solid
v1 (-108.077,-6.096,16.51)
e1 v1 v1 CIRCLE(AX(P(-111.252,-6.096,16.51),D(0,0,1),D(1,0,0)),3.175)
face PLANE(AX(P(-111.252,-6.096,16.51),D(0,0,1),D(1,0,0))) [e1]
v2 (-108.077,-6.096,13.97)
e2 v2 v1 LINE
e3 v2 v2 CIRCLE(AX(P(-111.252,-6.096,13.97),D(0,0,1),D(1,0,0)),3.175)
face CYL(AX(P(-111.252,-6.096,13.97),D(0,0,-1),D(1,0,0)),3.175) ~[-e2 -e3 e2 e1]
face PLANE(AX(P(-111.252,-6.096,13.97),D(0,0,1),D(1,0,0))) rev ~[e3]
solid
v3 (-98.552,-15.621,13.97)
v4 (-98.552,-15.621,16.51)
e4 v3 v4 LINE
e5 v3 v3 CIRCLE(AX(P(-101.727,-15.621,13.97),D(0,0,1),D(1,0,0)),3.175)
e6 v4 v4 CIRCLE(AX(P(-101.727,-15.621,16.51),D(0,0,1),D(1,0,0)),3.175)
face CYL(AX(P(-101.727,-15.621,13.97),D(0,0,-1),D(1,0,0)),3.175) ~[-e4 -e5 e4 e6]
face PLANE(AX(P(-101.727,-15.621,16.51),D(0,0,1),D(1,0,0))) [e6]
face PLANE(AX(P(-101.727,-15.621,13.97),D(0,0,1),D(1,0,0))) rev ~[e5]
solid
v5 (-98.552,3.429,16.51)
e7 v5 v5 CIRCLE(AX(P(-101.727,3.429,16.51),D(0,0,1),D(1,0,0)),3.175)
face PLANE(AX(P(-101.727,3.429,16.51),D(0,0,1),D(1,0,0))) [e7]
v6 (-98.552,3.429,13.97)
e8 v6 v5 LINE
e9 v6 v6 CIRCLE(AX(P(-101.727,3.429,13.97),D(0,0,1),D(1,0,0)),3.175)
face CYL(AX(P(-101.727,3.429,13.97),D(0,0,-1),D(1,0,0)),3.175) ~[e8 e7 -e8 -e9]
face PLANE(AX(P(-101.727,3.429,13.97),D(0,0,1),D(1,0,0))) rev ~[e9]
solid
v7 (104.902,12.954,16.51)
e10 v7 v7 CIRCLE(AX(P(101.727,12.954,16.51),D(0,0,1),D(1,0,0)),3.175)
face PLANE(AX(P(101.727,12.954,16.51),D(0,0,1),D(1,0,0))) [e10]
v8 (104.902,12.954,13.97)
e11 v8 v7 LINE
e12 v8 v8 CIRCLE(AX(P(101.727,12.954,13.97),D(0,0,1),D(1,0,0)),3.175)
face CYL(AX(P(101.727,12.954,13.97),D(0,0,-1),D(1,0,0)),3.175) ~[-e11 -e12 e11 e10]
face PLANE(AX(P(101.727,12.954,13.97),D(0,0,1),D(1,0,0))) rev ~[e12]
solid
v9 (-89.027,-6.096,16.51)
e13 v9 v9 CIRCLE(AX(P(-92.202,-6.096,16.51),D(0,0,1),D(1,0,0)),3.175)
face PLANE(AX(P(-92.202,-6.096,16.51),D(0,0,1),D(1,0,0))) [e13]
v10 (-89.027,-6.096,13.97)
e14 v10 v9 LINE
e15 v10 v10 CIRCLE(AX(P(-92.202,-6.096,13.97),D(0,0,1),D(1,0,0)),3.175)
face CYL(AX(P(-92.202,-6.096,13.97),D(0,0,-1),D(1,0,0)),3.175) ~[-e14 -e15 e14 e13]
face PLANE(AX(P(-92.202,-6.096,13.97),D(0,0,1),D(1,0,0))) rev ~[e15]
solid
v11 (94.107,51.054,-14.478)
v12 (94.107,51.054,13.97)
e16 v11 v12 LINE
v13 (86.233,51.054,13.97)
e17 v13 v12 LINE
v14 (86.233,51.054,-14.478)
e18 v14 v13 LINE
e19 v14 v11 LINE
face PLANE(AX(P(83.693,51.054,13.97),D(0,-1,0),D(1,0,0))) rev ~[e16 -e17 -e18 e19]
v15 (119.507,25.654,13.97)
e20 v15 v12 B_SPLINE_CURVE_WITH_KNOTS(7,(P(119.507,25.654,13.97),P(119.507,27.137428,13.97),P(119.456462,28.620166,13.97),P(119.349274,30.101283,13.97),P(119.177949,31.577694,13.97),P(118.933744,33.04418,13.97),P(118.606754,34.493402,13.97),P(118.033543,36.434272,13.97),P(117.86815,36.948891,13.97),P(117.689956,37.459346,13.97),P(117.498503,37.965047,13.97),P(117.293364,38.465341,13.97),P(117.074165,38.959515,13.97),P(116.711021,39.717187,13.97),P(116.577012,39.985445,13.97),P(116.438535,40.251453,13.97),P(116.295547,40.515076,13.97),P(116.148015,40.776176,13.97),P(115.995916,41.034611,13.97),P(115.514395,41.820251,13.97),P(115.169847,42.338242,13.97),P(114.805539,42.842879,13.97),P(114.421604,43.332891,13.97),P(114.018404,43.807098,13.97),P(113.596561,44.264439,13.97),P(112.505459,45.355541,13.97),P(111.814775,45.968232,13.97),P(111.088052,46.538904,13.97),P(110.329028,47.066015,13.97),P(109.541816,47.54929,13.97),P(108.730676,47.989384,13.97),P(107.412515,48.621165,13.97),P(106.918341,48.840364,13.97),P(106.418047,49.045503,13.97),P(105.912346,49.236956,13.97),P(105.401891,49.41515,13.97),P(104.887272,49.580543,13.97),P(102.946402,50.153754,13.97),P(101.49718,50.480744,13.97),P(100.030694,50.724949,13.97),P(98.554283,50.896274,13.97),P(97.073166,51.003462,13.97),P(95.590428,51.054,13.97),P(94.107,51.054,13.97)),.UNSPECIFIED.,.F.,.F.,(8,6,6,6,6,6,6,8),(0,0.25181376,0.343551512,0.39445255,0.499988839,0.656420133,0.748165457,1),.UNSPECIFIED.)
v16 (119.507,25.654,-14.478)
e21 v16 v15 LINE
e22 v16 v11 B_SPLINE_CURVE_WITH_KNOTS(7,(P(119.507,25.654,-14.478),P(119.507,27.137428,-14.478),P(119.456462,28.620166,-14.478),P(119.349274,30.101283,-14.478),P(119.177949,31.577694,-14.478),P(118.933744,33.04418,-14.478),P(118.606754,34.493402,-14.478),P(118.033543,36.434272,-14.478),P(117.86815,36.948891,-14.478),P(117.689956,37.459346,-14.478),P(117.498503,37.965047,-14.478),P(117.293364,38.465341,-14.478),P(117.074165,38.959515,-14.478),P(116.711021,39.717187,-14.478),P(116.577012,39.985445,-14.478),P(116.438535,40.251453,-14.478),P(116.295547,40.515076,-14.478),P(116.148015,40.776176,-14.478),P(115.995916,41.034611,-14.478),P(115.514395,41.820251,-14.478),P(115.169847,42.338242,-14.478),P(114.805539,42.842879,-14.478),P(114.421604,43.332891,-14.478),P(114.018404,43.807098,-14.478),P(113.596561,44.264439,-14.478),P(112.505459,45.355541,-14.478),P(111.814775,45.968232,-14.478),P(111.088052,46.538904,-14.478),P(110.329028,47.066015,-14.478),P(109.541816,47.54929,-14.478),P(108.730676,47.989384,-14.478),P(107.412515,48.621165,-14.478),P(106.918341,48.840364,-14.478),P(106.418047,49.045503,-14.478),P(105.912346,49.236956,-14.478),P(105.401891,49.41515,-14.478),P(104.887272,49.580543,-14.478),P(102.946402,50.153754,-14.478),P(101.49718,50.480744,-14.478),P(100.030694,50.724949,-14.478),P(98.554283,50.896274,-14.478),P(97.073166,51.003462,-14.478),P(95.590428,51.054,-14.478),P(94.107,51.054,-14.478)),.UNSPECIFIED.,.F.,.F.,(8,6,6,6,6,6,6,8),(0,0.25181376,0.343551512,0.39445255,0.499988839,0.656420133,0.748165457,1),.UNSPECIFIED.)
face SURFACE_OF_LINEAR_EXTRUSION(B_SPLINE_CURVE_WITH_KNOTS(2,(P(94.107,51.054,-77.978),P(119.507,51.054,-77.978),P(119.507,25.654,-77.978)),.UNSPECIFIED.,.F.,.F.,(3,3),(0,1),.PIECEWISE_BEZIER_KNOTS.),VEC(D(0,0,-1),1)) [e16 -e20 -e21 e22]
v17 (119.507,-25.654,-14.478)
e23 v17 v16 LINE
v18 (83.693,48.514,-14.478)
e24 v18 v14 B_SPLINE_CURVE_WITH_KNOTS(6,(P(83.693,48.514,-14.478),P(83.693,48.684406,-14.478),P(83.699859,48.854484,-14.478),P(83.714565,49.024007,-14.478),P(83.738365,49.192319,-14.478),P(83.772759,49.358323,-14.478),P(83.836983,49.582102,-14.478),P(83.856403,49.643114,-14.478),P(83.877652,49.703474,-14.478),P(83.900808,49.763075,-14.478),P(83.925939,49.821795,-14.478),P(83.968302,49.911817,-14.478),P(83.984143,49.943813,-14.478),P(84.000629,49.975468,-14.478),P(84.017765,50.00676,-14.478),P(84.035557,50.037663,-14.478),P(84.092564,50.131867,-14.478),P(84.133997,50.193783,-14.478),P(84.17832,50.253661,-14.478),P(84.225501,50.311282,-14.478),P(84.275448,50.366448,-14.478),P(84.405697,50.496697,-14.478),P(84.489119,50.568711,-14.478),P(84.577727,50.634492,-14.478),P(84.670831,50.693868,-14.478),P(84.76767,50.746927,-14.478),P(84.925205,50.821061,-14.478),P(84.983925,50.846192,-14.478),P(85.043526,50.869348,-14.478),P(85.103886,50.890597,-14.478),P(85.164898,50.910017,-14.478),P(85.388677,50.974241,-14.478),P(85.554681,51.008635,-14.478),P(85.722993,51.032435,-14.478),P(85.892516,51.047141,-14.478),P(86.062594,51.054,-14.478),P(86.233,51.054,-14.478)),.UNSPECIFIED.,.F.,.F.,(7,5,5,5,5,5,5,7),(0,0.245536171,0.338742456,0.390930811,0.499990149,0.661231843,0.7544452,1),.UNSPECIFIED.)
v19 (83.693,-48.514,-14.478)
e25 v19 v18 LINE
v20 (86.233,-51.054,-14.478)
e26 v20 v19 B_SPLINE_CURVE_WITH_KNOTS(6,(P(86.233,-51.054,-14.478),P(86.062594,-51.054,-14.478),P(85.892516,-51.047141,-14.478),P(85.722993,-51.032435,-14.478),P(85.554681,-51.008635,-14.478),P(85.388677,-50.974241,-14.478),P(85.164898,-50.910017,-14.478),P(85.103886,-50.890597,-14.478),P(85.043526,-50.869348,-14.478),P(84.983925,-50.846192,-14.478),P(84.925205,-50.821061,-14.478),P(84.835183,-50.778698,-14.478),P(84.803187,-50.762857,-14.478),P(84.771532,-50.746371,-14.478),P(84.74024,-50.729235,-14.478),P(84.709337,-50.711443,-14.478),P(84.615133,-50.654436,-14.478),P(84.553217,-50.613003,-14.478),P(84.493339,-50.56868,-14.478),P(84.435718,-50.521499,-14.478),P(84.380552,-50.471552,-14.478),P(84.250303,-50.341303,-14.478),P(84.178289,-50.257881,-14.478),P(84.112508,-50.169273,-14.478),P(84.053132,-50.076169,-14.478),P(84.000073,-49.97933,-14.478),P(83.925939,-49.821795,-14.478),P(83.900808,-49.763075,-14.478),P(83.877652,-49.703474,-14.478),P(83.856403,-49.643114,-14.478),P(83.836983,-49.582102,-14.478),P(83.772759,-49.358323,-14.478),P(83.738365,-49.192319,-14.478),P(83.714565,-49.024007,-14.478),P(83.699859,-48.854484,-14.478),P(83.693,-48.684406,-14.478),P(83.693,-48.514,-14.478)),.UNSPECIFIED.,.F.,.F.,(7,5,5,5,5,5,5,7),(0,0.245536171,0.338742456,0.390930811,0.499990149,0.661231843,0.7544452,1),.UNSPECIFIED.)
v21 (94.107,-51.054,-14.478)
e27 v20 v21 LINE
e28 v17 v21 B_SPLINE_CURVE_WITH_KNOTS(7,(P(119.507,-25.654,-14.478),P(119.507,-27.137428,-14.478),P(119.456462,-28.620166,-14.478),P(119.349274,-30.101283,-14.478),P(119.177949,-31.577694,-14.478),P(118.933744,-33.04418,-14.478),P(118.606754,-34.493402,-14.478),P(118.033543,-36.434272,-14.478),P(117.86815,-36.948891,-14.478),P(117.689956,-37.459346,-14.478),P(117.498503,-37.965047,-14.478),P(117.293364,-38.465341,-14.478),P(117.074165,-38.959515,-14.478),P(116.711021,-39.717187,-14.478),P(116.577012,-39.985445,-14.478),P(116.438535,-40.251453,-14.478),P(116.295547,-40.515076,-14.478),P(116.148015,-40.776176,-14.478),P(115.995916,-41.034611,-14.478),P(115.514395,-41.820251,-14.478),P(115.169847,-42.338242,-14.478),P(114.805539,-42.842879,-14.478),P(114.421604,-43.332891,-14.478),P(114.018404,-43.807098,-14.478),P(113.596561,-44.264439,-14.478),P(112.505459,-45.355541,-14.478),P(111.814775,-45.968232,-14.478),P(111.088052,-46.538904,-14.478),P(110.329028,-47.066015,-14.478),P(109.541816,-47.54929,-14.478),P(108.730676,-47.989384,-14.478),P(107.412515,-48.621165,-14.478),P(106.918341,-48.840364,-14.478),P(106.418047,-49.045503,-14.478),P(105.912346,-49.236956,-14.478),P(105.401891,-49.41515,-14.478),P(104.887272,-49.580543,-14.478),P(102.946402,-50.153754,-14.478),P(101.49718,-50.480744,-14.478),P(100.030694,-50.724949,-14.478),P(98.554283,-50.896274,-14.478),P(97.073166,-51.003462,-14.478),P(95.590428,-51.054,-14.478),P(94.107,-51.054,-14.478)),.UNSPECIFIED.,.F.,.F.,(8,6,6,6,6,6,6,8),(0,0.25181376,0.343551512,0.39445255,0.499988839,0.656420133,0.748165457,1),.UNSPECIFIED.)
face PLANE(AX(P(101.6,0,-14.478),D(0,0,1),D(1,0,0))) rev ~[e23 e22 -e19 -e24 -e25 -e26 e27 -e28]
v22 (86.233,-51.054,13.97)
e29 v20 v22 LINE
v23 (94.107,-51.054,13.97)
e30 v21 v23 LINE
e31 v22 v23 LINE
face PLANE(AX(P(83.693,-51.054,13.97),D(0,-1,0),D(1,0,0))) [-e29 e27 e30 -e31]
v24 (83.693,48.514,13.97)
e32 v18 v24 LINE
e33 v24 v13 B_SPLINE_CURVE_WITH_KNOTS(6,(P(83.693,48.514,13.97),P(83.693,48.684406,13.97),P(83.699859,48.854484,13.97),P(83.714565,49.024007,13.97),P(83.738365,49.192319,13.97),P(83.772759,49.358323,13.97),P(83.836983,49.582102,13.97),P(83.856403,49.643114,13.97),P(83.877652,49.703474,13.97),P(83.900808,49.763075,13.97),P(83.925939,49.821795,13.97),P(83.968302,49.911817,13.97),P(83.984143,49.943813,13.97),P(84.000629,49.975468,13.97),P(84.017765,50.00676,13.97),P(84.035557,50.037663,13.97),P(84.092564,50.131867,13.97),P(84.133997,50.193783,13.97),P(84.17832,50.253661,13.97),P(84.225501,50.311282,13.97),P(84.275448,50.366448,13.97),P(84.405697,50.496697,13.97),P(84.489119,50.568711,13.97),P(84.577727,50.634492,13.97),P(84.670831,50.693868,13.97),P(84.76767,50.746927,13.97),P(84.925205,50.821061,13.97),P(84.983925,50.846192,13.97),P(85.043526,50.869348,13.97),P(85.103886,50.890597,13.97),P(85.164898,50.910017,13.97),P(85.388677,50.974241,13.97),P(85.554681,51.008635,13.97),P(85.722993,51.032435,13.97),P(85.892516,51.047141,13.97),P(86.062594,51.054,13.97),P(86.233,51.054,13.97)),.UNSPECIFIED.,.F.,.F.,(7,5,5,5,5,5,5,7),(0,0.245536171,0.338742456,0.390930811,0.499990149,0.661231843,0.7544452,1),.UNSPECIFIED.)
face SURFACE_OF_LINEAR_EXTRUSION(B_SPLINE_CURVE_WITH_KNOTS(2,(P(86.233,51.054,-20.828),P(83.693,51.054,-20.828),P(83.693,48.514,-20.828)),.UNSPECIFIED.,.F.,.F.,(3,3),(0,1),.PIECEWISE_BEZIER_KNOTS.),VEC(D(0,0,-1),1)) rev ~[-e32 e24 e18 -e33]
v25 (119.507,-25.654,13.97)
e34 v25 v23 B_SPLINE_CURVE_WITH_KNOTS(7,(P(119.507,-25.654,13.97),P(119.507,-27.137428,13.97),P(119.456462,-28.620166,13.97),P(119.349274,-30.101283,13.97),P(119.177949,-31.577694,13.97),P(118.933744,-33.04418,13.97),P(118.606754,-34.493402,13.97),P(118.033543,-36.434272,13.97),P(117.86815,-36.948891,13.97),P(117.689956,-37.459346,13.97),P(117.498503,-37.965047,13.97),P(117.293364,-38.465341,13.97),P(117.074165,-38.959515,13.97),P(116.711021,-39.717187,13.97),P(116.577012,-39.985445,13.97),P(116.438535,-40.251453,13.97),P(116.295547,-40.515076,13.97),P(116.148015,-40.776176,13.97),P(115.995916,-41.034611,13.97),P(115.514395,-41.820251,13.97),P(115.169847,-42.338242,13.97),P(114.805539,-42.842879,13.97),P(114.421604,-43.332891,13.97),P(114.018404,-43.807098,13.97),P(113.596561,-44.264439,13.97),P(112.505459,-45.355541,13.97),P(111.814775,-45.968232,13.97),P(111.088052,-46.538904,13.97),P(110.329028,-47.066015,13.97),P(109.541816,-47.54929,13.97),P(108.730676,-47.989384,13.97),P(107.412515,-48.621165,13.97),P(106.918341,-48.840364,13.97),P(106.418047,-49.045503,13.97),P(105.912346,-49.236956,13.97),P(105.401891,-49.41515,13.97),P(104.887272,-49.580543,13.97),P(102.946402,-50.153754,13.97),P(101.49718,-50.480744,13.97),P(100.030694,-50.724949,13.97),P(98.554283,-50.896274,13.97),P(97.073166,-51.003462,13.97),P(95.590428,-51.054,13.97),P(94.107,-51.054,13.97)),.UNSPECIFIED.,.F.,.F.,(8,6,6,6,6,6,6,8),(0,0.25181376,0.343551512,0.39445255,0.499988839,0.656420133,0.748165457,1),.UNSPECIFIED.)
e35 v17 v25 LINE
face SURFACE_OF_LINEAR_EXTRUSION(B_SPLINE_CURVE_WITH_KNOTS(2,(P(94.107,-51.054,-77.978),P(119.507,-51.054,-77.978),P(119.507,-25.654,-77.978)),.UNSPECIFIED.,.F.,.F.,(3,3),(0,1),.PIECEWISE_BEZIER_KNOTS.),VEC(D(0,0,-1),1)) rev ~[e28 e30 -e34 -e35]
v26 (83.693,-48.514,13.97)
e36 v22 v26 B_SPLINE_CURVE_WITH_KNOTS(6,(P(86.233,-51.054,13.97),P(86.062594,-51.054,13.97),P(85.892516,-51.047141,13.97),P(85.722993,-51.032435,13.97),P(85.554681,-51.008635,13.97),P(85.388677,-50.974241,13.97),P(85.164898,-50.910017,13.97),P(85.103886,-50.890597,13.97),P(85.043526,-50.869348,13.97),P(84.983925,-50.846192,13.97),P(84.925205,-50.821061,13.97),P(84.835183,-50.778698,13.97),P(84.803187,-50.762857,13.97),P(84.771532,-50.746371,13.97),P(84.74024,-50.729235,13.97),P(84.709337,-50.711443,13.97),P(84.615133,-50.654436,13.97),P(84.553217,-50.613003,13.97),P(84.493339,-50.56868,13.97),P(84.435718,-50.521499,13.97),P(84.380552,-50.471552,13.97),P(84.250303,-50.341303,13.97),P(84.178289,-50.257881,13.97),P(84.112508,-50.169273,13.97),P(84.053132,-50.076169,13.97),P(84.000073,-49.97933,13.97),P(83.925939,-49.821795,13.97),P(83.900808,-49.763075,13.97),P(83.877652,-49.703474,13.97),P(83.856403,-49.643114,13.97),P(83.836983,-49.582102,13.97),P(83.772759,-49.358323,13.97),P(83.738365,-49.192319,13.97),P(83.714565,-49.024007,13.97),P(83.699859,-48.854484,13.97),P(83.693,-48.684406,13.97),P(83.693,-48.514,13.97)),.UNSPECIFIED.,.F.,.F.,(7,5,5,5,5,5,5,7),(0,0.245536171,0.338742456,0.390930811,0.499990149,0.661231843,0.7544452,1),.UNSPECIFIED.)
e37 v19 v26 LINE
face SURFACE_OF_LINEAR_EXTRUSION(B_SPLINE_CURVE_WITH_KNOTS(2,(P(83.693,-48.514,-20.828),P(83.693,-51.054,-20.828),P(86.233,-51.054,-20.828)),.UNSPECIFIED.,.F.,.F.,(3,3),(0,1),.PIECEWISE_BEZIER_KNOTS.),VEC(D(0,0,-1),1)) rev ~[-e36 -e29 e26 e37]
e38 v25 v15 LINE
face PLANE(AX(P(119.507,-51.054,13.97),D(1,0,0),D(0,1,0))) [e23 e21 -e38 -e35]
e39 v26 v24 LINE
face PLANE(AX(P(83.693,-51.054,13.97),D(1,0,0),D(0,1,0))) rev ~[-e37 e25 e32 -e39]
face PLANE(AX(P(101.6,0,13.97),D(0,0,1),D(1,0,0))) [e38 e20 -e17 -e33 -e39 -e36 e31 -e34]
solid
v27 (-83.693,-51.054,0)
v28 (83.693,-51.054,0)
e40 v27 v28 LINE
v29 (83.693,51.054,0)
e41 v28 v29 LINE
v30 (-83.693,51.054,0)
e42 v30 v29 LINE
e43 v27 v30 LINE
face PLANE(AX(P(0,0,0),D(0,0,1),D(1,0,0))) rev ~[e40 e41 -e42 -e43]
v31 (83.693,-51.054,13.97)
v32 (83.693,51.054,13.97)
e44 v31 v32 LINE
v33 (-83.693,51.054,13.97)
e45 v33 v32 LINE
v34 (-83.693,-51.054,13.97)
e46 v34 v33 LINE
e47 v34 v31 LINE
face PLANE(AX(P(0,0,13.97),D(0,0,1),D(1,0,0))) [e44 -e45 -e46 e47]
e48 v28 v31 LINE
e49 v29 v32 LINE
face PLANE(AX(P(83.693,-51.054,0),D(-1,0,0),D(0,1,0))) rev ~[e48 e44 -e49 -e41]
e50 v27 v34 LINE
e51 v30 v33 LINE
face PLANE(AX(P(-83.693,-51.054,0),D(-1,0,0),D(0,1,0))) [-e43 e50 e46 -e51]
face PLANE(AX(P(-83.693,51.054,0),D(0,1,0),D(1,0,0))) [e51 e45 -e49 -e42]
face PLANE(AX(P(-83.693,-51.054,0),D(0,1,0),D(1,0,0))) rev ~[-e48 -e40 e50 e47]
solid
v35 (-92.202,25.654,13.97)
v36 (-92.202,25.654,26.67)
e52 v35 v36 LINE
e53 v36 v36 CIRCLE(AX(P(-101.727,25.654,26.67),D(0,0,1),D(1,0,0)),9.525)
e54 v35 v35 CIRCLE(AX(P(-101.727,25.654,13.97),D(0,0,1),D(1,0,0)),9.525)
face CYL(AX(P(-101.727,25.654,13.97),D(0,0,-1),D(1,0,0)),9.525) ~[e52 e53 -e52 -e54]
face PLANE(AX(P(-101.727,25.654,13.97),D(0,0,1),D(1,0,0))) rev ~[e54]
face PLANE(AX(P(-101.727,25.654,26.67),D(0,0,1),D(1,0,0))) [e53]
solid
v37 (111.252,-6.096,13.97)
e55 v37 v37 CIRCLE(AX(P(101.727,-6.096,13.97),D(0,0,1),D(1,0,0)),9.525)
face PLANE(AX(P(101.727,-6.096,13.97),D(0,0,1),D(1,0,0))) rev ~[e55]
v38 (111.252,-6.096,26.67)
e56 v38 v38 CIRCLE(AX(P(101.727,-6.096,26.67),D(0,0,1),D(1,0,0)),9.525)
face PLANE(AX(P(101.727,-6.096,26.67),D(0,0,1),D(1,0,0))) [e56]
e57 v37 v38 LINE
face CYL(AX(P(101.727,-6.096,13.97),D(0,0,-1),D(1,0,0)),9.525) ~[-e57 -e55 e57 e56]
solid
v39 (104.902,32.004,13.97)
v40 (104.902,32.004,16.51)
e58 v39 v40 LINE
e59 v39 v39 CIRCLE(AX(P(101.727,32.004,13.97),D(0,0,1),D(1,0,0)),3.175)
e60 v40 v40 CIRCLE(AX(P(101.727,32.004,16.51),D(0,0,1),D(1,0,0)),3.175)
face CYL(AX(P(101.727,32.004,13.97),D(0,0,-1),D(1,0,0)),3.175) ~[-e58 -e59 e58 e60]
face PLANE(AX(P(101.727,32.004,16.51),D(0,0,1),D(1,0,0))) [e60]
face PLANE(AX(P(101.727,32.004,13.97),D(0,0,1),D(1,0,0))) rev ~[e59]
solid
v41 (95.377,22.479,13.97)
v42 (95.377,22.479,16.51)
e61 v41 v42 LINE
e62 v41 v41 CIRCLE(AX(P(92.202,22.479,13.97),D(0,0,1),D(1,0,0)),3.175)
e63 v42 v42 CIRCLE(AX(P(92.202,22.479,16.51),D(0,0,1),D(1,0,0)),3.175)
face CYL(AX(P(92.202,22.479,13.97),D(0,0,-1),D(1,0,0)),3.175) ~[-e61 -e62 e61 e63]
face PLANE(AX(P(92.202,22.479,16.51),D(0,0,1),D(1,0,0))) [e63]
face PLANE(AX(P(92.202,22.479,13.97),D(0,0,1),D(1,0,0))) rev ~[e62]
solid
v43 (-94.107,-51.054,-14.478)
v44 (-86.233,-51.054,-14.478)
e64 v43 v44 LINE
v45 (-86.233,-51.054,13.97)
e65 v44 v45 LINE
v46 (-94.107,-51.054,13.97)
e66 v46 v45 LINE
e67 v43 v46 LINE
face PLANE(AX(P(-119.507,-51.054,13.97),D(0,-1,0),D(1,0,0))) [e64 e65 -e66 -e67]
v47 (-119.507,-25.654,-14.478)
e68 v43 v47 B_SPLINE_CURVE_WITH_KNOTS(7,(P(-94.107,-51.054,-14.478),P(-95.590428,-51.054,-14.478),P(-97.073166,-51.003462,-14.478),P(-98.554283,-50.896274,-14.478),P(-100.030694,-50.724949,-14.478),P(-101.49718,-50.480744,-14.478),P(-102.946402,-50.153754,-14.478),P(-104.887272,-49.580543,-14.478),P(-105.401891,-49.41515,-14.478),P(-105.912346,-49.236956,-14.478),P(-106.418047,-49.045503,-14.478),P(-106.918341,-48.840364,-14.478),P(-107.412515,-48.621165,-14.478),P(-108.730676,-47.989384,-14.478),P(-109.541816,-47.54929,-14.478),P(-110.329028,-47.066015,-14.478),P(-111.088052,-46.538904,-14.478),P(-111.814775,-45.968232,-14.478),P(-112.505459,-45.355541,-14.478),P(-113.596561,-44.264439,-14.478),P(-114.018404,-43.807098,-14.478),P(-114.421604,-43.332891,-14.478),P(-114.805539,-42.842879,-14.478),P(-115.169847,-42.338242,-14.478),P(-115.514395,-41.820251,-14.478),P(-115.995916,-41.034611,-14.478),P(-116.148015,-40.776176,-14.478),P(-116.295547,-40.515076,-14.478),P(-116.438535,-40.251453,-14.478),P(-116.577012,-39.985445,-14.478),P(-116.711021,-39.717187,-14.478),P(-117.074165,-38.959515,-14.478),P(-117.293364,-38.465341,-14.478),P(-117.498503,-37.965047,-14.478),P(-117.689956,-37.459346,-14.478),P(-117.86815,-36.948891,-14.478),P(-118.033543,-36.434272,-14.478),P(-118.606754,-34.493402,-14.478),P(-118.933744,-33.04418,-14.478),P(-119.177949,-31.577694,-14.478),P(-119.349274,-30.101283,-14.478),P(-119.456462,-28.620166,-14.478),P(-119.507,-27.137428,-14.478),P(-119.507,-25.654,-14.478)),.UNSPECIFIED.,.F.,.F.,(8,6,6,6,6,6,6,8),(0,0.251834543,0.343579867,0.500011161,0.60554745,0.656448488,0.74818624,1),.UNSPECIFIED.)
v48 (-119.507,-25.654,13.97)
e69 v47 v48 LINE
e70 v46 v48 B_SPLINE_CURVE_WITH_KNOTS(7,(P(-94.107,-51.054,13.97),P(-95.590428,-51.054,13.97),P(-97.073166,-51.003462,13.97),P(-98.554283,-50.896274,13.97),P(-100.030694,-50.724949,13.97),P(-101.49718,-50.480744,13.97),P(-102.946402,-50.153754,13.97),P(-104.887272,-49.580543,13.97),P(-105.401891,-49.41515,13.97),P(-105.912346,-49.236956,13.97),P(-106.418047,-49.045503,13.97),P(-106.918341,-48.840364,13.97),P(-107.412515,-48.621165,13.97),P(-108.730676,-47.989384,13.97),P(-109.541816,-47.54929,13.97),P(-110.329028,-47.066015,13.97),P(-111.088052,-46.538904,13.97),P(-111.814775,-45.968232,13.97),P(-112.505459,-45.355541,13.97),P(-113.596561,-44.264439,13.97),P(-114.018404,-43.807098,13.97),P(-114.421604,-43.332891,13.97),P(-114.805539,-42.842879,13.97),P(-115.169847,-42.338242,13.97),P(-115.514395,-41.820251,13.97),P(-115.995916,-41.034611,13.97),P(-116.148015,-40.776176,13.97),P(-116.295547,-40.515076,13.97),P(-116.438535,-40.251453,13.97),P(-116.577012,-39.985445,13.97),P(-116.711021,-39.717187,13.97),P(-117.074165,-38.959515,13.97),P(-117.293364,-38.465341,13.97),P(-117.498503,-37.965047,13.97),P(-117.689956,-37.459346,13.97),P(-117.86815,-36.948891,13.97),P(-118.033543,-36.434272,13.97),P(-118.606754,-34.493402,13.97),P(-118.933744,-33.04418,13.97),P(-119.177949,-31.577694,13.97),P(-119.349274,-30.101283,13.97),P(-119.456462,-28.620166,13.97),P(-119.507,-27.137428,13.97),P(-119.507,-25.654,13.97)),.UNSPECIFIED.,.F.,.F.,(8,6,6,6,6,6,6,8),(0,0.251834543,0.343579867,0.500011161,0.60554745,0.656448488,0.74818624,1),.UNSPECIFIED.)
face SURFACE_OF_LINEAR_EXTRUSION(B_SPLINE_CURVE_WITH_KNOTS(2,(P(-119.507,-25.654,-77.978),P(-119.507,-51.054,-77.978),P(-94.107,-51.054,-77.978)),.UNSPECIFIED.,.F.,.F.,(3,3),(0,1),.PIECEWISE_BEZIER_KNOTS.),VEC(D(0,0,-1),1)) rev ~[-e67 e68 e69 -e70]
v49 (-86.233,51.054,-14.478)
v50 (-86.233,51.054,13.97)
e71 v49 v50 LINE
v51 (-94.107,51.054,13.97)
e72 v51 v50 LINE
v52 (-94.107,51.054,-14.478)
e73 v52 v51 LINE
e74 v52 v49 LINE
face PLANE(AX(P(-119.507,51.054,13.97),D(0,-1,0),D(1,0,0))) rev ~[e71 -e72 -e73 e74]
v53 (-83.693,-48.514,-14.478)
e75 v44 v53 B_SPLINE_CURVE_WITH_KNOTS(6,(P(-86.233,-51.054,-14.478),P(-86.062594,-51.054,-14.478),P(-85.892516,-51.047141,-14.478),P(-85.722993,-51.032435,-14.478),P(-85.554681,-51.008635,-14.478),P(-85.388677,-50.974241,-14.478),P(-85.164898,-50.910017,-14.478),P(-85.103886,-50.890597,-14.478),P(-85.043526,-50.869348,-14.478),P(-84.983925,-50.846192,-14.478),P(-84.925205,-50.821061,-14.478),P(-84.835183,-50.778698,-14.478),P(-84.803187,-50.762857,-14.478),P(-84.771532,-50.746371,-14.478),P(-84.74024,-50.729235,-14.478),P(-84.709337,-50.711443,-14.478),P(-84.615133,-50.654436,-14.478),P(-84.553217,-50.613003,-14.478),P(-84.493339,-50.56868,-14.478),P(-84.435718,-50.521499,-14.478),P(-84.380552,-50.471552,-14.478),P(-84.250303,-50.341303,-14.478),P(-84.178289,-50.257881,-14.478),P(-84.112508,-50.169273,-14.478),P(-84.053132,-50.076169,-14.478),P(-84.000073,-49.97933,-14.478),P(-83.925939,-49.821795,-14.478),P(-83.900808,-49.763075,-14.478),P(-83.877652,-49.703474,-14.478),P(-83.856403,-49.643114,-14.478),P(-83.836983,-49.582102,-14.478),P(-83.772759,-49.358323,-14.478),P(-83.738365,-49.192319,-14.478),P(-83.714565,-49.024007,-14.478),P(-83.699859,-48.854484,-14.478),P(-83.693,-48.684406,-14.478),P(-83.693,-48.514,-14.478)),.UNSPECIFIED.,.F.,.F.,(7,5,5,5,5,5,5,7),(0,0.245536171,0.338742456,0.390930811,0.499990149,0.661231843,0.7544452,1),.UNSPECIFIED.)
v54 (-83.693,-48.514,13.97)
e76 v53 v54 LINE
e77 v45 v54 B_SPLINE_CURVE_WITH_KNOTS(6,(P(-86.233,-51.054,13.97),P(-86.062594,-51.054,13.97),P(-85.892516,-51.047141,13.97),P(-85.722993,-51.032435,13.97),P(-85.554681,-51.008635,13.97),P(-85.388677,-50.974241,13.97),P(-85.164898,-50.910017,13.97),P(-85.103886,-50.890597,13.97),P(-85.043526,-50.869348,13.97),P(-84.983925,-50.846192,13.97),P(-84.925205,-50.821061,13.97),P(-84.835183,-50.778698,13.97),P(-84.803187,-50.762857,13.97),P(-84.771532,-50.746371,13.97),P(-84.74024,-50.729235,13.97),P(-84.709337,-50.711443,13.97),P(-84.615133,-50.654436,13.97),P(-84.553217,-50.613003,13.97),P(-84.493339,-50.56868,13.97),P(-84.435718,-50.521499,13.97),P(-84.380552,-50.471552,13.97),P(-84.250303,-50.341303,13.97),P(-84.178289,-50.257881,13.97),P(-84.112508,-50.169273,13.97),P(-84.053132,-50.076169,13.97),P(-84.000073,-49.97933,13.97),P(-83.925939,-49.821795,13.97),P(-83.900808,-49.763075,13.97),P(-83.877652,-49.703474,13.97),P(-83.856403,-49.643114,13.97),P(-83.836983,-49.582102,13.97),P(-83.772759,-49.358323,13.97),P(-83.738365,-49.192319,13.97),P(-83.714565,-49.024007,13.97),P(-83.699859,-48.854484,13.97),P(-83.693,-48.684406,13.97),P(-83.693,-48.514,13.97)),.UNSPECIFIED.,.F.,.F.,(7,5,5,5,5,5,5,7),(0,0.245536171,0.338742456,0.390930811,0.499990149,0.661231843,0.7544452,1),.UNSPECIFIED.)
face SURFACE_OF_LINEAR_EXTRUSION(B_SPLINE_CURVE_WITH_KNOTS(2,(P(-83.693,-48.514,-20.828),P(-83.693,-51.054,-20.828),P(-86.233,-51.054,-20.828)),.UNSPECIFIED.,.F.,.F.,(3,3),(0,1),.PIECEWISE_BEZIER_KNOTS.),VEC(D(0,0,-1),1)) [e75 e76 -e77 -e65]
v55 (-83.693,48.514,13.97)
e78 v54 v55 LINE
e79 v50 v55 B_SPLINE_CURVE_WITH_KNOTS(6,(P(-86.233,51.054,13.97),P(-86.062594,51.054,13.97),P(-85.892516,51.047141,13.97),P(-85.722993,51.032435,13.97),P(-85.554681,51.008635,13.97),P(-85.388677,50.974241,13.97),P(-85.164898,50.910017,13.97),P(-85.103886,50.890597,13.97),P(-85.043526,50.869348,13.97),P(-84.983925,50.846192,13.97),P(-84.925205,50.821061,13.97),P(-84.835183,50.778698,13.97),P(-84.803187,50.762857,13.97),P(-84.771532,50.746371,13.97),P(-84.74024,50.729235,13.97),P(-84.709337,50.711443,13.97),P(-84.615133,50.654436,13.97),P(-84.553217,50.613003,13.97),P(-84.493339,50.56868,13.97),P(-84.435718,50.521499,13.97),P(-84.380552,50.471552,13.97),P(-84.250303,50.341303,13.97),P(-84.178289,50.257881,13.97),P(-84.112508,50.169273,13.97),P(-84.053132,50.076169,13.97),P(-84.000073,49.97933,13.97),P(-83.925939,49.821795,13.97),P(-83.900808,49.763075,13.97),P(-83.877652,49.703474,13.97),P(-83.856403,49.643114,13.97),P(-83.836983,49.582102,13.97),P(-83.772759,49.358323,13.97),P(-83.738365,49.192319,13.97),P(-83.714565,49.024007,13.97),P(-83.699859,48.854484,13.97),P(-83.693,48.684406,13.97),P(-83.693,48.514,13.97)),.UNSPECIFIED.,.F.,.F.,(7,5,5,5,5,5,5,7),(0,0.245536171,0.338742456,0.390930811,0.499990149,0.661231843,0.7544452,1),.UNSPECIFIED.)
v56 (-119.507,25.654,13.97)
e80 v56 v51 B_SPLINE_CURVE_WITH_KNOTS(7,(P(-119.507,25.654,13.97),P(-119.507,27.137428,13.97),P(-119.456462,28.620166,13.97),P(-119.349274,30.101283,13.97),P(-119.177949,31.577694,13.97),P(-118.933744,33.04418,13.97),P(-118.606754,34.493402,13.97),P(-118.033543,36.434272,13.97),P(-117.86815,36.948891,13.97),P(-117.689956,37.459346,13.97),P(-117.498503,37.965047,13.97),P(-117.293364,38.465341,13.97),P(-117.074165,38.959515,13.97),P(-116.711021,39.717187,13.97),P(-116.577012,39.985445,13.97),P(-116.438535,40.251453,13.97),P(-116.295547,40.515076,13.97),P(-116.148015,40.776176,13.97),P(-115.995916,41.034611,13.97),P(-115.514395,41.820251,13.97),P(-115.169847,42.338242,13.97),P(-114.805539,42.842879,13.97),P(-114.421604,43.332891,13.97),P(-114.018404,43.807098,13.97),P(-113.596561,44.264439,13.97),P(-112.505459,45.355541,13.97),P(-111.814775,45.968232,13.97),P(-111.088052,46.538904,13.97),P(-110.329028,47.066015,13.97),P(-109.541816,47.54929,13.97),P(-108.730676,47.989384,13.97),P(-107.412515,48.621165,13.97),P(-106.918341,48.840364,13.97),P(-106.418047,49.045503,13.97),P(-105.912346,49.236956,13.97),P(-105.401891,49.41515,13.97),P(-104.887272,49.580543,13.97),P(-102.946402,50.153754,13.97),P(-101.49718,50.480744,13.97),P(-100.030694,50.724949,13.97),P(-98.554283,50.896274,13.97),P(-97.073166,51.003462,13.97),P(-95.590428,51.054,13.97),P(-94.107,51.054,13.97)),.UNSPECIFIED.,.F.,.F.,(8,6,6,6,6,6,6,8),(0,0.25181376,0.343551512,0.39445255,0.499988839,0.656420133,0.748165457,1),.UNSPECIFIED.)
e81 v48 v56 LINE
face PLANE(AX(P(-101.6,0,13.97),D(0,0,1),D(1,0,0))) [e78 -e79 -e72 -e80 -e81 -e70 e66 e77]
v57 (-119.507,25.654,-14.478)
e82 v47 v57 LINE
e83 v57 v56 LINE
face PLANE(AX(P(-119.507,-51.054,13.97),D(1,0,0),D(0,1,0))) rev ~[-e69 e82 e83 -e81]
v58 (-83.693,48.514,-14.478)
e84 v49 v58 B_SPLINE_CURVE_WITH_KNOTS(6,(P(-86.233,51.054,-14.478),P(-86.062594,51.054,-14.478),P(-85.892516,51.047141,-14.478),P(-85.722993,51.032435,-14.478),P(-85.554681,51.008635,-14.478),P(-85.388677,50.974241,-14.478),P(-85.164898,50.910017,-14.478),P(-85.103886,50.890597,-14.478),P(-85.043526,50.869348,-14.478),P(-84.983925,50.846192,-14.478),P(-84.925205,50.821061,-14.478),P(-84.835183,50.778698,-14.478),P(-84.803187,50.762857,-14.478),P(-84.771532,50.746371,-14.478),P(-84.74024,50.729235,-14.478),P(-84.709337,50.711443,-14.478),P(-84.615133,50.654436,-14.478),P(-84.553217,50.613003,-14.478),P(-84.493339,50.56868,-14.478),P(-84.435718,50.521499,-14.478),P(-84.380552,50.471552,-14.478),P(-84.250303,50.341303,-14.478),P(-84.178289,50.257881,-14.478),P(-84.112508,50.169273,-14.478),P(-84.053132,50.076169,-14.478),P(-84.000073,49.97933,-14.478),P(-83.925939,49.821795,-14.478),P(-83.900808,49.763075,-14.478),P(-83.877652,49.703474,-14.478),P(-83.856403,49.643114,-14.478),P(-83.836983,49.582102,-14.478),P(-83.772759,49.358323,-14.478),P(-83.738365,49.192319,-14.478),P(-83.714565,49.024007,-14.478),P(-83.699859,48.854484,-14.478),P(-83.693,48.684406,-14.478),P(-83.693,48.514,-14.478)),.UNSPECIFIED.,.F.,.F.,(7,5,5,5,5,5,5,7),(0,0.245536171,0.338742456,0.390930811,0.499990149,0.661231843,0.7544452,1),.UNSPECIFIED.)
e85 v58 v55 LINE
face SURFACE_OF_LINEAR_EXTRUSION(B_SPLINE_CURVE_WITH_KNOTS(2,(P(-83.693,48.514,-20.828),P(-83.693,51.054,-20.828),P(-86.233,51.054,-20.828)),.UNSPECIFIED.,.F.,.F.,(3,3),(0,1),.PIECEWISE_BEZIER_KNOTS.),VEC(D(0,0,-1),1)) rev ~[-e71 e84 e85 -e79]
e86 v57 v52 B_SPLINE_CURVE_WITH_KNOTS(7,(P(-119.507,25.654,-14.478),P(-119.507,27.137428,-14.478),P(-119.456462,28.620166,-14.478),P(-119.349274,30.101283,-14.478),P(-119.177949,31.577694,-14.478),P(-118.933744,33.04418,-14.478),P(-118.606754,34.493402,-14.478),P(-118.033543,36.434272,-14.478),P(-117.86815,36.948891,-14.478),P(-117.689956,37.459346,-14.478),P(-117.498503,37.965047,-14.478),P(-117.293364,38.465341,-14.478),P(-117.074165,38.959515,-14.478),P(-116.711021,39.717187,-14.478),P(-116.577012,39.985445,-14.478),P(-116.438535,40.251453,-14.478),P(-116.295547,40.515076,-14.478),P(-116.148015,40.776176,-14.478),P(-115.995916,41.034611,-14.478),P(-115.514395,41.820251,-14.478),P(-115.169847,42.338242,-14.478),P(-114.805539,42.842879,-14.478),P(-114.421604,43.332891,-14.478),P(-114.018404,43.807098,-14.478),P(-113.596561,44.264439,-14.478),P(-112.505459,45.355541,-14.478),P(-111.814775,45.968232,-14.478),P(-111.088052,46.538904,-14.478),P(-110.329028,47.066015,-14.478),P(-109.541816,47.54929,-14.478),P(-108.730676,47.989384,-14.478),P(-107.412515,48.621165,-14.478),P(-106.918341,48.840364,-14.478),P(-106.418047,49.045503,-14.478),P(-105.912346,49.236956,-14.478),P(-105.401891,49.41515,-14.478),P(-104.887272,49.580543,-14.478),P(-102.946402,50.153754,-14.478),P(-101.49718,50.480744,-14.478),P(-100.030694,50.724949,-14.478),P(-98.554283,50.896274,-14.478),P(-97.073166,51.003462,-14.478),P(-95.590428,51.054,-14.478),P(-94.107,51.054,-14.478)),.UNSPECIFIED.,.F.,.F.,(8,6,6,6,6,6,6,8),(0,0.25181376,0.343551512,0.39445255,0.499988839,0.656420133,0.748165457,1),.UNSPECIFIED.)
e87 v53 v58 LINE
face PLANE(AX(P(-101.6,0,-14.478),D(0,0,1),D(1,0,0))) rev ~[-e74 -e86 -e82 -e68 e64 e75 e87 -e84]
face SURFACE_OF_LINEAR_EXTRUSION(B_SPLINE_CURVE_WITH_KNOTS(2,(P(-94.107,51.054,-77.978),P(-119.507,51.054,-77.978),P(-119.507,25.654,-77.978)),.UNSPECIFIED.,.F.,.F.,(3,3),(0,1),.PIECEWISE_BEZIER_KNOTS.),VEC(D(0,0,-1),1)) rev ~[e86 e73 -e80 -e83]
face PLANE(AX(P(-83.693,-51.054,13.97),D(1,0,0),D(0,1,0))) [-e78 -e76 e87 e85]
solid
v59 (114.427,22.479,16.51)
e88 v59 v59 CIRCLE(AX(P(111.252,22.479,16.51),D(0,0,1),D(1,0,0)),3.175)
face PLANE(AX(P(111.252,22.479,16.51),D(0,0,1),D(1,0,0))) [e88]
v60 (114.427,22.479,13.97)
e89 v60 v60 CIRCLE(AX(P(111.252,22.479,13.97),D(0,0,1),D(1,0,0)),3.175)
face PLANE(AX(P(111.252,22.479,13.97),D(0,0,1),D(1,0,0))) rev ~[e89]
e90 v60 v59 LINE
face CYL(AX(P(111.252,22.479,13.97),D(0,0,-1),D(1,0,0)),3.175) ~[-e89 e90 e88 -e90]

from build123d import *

# Parameters (mm, degrees)
F0_W          = 167.386
F0_H          = 102.108
F1_DEPTH      = 13.97
F2_W          = 35.814
F2_H          = 102.108
F3_DEPTH      = 28.448
F4_W          = 35.814
F4_H          = 102.108
F5_DEPTH      = 28.448
F6_T1_DEPTH   = 155.448
F6_2_T1_DEPTH = 155.448
F7_T1_DEPTH   = 41.148
F7_2_T1_DEPTH = 41.148
F8_R          = 9.525
F9_DEPTH      = 12.7
F10_R         = 3.175
F14_DEPTH     = 2.54
F11_R         = 3.175
F15_DEPTH     = 2.54
F12_R         = 3.175
F13_R         = 3.175
F16_DEPTH     = 2.54
F17_R         = 3.175
F22_DEPTH     = 2.54
F19_R         = 3.175
F23_DEPTH     = 2.54
F20_R         = 3.175
F24_DEPTH     = 2.54
F21_R         = 9.525
F25_DEPTH     = 12.7
F26_R         = 3.175
F27_DEPTH     = 2.54


# Not quite as in the source:
# - a fillet or chamfer that OpenCascade refuses, or shapes differently, is made with other operations: its cross-section is extruded or revolved along the edge and cut away or added


with BuildPart() as f1:
    # F0 (on Top) → F1 (new body)
    with BuildSketch(Plane.XY):
        Rectangle(F0_W, F0_H)
    extrude(amount=F1_DEPTH)


with BuildPart() as f3:
    # F2 (on face) → F3 (new body)
    with BuildSketch(Plane.XY.offset(13.97)):
        with Locations((-101.6, 0)):
            Rectangle(F2_W, F2_H)
    extrude(amount=-F3_DEPTH)

    # F6: fillet of radius 25.4 on 2 edges, made by hand

    # F6_s2 → F6_t1 (cut)
    with BuildSketch(Plane.XY.offset(-77.978)):
        with BuildLine():
            add(Edge.make_bspline(
                [(-94.107, 51.054), (-119.507, 51.054), (-119.507, 25.654)],
                knots=[0, 0, 0, 1, 1, 1], degree=2, weights=[1, 1, 1]))
            Line((-119.507, 25.654), (-119.507, 51.054))
            Line((-119.507, 51.054), (-94.107, 51.054))
        make_face()
        with BuildLine():
            add(Edge.make_bspline(
                [(-119.507, -25.654), (-119.507, -51.054), (-94.107, -51.054)],
                knots=[0, 0, 0, 1, 1, 1], degree=2, weights=[1, 1, 1]))
            Line((-94.107, -51.054), (-119.507, -51.054))
            Line((-119.507, -51.054), (-119.507, -25.654))
        make_face()
    extrude(amount=F6_T1_DEPTH, mode=Mode.SUBTRACT)

    # F7: fillet of radius 2.54 on 2 edges, made by hand

    # F7_s2 → F7_t1 (cut)
    with BuildSketch(Plane.XY.offset(-20.828)):
        with BuildLine():
            add(Edge.make_bspline(
                [(-83.693, 48.514), (-83.693, 51.054), (-86.233, 51.054)],
                knots=[0, 0, 0, 1, 1, 1], degree=2, weights=[1, 1, 1]))
            Line((-86.233, 51.054), (-83.693, 51.054))
            Line((-83.693, 51.054), (-83.693, 48.514))
        make_face()
        with BuildLine():
            add(Edge.make_bspline(
                [(-83.693, -48.514), (-83.693, -51.054), (-86.233, -51.054)],
                knots=[0, 0, 0, 1, 1, 1], degree=2, weights=[1, 1, 1]))
            Line((-86.233, -51.054), (-83.693, -51.054))
            Line((-83.693, -51.054), (-83.693, -48.514))
        make_face()
    extrude(amount=F7_T1_DEPTH, mode=Mode.SUBTRACT)


with BuildPart() as f5:
    # F4 (on face) → F5 (new body)
    with BuildSketch(Plane.XY.offset(13.97)):
        with Locations((101.6, 0)):
            Rectangle(F4_W, F4_H)
    extrude(amount=-F5_DEPTH)

    # F6#2: fillet of radius 25.4 on 2 edges, made by hand

    # F6_2_s2 → F6_2_t1 (cut)
    with BuildSketch(Plane.XY.offset(-77.978)):
        with BuildLine():
            add(Edge.make_bspline(
                [(94.107, 51.054), (119.507, 51.054), (119.507, 25.654)],
                knots=[0, 0, 0, 1, 1, 1], degree=2, weights=[1, 1, 1]))
            Line((119.507, 25.654), (119.507, 51.054))
            Line((119.507, 51.054), (94.107, 51.054))
        make_face()
        with BuildLine():
            add(Edge.make_bspline(
                [(94.107, -51.054), (119.507, -51.054), (119.507, -25.654)],
                knots=[0, 0, 0, 1, 1, 1], degree=2, weights=[1, 1, 1]))
            Line((119.507, -25.654), (119.507, -51.054))
            Line((119.507, -51.054), (94.107, -51.054))
        make_face()
    extrude(amount=F6_2_T1_DEPTH, mode=Mode.SUBTRACT)

    # F7#2: fillet of radius 2.54 on 2 edges, made by hand

    # F7_2_s2 → F7_2_t1 (cut)
    with BuildSketch(Plane.XY.offset(-20.828)):
        with BuildLine():
            add(Edge.make_bspline(
                [(86.233, 51.054), (83.693, 51.054), (83.693, 48.514)],
                knots=[0, 0, 0, 1, 1, 1], degree=2, weights=[1, 1, 1]))
            Line((83.693, 48.514), (83.693, 51.054))
            Line((83.693, 51.054), (86.233, 51.054))
        make_face()
        with BuildLine():
            add(Edge.make_bspline(
                [(83.693, -48.514), (83.693, -51.054), (86.233, -51.054)],
                knots=[0, 0, 0, 1, 1, 1], degree=2, weights=[1, 1, 1]))
            Line((86.233, -51.054), (83.693, -51.054))
            Line((83.693, -51.054), (83.693, -48.514))
        make_face()
    extrude(amount=F7_2_T1_DEPTH, mode=Mode.SUBTRACT)


with BuildPart() as f9:
    # F8 (on face) → F9 (new body)
    with BuildSketch(Plane.XY.offset(13.97)):
        with Locations((-101.727, 25.654)):
            Circle(F8_R)
    extrude(amount=F9_DEPTH)


with BuildPart() as f14:
    # F10 (on face) → F14 (new body)
    with BuildSketch(Plane.XY.offset(13.97)):
        with Locations((-101.727, 3.429)):
            Circle(F10_R)
    extrude(amount=F14_DEPTH)


with BuildPart() as f15:
    # F11 (on face) → F15 (new body)
    with BuildSketch(Plane.XY.offset(13.97)):
        with Locations((-101.727, -15.621)):
            Circle(F11_R)
    extrude(amount=F15_DEPTH)


with BuildPart() as f15b:
    # F12 (on face) → F15, piece 2 (new body)
    with BuildSketch(Plane.XY.offset(13.97)):
        with Locations((-92.202, -6.096)):
            Circle(F12_R)
    extrude(amount=F15_DEPTH)


with BuildPart() as f16:
    # F13 (on face) → F16 (new body)
    with BuildSketch(Plane.XY.offset(13.97)):
        with Locations((-111.252, -6.096)):
            Circle(F13_R)
    extrude(amount=F16_DEPTH)


with BuildPart() as f22:
    # F17 (on face) → F22 (new body)
    with BuildSketch(Plane.XY.offset(13.97)):
        with Locations((101.727, 32.004)):
            Circle(F17_R)
    extrude(amount=F22_DEPTH)


with BuildPart() as f23:
    # F19 (on face) → F23 (new body)
    with BuildSketch(Plane.XY.offset(13.97)):
        with Locations((92.202, 22.479)):
            Circle(F19_R)
    extrude(amount=F23_DEPTH)


with BuildPart() as f24:
    # F20 (on face) → F24 (new body)
    with BuildSketch(Plane.XY.offset(13.97)):
        with Locations((101.727, 12.954)):
            Circle(F20_R)
    extrude(amount=F24_DEPTH)


with BuildPart() as f25:
    # F21 (on face) → F25 (new body)
    with BuildSketch(Plane.XY.offset(13.97)):
        with Locations((101.727, -6.096)):
            Circle(F21_R)
    extrude(amount=F25_DEPTH)


with BuildPart() as f27:
    # F26 (on face) → F27 (new body)
    with BuildSketch(Plane.XY.offset(13.97)):
        with Locations((111.252, 22.479)):
            Circle(F26_R)
    extrude(amount=F27_DEPTH)


solid = Compound([f1.part, f3.part, f5.part, f9.part, f14.part, f15.part, f15b.part, f16.part, f22.part, f23.part, f24.part, f25.part, f27.part])
